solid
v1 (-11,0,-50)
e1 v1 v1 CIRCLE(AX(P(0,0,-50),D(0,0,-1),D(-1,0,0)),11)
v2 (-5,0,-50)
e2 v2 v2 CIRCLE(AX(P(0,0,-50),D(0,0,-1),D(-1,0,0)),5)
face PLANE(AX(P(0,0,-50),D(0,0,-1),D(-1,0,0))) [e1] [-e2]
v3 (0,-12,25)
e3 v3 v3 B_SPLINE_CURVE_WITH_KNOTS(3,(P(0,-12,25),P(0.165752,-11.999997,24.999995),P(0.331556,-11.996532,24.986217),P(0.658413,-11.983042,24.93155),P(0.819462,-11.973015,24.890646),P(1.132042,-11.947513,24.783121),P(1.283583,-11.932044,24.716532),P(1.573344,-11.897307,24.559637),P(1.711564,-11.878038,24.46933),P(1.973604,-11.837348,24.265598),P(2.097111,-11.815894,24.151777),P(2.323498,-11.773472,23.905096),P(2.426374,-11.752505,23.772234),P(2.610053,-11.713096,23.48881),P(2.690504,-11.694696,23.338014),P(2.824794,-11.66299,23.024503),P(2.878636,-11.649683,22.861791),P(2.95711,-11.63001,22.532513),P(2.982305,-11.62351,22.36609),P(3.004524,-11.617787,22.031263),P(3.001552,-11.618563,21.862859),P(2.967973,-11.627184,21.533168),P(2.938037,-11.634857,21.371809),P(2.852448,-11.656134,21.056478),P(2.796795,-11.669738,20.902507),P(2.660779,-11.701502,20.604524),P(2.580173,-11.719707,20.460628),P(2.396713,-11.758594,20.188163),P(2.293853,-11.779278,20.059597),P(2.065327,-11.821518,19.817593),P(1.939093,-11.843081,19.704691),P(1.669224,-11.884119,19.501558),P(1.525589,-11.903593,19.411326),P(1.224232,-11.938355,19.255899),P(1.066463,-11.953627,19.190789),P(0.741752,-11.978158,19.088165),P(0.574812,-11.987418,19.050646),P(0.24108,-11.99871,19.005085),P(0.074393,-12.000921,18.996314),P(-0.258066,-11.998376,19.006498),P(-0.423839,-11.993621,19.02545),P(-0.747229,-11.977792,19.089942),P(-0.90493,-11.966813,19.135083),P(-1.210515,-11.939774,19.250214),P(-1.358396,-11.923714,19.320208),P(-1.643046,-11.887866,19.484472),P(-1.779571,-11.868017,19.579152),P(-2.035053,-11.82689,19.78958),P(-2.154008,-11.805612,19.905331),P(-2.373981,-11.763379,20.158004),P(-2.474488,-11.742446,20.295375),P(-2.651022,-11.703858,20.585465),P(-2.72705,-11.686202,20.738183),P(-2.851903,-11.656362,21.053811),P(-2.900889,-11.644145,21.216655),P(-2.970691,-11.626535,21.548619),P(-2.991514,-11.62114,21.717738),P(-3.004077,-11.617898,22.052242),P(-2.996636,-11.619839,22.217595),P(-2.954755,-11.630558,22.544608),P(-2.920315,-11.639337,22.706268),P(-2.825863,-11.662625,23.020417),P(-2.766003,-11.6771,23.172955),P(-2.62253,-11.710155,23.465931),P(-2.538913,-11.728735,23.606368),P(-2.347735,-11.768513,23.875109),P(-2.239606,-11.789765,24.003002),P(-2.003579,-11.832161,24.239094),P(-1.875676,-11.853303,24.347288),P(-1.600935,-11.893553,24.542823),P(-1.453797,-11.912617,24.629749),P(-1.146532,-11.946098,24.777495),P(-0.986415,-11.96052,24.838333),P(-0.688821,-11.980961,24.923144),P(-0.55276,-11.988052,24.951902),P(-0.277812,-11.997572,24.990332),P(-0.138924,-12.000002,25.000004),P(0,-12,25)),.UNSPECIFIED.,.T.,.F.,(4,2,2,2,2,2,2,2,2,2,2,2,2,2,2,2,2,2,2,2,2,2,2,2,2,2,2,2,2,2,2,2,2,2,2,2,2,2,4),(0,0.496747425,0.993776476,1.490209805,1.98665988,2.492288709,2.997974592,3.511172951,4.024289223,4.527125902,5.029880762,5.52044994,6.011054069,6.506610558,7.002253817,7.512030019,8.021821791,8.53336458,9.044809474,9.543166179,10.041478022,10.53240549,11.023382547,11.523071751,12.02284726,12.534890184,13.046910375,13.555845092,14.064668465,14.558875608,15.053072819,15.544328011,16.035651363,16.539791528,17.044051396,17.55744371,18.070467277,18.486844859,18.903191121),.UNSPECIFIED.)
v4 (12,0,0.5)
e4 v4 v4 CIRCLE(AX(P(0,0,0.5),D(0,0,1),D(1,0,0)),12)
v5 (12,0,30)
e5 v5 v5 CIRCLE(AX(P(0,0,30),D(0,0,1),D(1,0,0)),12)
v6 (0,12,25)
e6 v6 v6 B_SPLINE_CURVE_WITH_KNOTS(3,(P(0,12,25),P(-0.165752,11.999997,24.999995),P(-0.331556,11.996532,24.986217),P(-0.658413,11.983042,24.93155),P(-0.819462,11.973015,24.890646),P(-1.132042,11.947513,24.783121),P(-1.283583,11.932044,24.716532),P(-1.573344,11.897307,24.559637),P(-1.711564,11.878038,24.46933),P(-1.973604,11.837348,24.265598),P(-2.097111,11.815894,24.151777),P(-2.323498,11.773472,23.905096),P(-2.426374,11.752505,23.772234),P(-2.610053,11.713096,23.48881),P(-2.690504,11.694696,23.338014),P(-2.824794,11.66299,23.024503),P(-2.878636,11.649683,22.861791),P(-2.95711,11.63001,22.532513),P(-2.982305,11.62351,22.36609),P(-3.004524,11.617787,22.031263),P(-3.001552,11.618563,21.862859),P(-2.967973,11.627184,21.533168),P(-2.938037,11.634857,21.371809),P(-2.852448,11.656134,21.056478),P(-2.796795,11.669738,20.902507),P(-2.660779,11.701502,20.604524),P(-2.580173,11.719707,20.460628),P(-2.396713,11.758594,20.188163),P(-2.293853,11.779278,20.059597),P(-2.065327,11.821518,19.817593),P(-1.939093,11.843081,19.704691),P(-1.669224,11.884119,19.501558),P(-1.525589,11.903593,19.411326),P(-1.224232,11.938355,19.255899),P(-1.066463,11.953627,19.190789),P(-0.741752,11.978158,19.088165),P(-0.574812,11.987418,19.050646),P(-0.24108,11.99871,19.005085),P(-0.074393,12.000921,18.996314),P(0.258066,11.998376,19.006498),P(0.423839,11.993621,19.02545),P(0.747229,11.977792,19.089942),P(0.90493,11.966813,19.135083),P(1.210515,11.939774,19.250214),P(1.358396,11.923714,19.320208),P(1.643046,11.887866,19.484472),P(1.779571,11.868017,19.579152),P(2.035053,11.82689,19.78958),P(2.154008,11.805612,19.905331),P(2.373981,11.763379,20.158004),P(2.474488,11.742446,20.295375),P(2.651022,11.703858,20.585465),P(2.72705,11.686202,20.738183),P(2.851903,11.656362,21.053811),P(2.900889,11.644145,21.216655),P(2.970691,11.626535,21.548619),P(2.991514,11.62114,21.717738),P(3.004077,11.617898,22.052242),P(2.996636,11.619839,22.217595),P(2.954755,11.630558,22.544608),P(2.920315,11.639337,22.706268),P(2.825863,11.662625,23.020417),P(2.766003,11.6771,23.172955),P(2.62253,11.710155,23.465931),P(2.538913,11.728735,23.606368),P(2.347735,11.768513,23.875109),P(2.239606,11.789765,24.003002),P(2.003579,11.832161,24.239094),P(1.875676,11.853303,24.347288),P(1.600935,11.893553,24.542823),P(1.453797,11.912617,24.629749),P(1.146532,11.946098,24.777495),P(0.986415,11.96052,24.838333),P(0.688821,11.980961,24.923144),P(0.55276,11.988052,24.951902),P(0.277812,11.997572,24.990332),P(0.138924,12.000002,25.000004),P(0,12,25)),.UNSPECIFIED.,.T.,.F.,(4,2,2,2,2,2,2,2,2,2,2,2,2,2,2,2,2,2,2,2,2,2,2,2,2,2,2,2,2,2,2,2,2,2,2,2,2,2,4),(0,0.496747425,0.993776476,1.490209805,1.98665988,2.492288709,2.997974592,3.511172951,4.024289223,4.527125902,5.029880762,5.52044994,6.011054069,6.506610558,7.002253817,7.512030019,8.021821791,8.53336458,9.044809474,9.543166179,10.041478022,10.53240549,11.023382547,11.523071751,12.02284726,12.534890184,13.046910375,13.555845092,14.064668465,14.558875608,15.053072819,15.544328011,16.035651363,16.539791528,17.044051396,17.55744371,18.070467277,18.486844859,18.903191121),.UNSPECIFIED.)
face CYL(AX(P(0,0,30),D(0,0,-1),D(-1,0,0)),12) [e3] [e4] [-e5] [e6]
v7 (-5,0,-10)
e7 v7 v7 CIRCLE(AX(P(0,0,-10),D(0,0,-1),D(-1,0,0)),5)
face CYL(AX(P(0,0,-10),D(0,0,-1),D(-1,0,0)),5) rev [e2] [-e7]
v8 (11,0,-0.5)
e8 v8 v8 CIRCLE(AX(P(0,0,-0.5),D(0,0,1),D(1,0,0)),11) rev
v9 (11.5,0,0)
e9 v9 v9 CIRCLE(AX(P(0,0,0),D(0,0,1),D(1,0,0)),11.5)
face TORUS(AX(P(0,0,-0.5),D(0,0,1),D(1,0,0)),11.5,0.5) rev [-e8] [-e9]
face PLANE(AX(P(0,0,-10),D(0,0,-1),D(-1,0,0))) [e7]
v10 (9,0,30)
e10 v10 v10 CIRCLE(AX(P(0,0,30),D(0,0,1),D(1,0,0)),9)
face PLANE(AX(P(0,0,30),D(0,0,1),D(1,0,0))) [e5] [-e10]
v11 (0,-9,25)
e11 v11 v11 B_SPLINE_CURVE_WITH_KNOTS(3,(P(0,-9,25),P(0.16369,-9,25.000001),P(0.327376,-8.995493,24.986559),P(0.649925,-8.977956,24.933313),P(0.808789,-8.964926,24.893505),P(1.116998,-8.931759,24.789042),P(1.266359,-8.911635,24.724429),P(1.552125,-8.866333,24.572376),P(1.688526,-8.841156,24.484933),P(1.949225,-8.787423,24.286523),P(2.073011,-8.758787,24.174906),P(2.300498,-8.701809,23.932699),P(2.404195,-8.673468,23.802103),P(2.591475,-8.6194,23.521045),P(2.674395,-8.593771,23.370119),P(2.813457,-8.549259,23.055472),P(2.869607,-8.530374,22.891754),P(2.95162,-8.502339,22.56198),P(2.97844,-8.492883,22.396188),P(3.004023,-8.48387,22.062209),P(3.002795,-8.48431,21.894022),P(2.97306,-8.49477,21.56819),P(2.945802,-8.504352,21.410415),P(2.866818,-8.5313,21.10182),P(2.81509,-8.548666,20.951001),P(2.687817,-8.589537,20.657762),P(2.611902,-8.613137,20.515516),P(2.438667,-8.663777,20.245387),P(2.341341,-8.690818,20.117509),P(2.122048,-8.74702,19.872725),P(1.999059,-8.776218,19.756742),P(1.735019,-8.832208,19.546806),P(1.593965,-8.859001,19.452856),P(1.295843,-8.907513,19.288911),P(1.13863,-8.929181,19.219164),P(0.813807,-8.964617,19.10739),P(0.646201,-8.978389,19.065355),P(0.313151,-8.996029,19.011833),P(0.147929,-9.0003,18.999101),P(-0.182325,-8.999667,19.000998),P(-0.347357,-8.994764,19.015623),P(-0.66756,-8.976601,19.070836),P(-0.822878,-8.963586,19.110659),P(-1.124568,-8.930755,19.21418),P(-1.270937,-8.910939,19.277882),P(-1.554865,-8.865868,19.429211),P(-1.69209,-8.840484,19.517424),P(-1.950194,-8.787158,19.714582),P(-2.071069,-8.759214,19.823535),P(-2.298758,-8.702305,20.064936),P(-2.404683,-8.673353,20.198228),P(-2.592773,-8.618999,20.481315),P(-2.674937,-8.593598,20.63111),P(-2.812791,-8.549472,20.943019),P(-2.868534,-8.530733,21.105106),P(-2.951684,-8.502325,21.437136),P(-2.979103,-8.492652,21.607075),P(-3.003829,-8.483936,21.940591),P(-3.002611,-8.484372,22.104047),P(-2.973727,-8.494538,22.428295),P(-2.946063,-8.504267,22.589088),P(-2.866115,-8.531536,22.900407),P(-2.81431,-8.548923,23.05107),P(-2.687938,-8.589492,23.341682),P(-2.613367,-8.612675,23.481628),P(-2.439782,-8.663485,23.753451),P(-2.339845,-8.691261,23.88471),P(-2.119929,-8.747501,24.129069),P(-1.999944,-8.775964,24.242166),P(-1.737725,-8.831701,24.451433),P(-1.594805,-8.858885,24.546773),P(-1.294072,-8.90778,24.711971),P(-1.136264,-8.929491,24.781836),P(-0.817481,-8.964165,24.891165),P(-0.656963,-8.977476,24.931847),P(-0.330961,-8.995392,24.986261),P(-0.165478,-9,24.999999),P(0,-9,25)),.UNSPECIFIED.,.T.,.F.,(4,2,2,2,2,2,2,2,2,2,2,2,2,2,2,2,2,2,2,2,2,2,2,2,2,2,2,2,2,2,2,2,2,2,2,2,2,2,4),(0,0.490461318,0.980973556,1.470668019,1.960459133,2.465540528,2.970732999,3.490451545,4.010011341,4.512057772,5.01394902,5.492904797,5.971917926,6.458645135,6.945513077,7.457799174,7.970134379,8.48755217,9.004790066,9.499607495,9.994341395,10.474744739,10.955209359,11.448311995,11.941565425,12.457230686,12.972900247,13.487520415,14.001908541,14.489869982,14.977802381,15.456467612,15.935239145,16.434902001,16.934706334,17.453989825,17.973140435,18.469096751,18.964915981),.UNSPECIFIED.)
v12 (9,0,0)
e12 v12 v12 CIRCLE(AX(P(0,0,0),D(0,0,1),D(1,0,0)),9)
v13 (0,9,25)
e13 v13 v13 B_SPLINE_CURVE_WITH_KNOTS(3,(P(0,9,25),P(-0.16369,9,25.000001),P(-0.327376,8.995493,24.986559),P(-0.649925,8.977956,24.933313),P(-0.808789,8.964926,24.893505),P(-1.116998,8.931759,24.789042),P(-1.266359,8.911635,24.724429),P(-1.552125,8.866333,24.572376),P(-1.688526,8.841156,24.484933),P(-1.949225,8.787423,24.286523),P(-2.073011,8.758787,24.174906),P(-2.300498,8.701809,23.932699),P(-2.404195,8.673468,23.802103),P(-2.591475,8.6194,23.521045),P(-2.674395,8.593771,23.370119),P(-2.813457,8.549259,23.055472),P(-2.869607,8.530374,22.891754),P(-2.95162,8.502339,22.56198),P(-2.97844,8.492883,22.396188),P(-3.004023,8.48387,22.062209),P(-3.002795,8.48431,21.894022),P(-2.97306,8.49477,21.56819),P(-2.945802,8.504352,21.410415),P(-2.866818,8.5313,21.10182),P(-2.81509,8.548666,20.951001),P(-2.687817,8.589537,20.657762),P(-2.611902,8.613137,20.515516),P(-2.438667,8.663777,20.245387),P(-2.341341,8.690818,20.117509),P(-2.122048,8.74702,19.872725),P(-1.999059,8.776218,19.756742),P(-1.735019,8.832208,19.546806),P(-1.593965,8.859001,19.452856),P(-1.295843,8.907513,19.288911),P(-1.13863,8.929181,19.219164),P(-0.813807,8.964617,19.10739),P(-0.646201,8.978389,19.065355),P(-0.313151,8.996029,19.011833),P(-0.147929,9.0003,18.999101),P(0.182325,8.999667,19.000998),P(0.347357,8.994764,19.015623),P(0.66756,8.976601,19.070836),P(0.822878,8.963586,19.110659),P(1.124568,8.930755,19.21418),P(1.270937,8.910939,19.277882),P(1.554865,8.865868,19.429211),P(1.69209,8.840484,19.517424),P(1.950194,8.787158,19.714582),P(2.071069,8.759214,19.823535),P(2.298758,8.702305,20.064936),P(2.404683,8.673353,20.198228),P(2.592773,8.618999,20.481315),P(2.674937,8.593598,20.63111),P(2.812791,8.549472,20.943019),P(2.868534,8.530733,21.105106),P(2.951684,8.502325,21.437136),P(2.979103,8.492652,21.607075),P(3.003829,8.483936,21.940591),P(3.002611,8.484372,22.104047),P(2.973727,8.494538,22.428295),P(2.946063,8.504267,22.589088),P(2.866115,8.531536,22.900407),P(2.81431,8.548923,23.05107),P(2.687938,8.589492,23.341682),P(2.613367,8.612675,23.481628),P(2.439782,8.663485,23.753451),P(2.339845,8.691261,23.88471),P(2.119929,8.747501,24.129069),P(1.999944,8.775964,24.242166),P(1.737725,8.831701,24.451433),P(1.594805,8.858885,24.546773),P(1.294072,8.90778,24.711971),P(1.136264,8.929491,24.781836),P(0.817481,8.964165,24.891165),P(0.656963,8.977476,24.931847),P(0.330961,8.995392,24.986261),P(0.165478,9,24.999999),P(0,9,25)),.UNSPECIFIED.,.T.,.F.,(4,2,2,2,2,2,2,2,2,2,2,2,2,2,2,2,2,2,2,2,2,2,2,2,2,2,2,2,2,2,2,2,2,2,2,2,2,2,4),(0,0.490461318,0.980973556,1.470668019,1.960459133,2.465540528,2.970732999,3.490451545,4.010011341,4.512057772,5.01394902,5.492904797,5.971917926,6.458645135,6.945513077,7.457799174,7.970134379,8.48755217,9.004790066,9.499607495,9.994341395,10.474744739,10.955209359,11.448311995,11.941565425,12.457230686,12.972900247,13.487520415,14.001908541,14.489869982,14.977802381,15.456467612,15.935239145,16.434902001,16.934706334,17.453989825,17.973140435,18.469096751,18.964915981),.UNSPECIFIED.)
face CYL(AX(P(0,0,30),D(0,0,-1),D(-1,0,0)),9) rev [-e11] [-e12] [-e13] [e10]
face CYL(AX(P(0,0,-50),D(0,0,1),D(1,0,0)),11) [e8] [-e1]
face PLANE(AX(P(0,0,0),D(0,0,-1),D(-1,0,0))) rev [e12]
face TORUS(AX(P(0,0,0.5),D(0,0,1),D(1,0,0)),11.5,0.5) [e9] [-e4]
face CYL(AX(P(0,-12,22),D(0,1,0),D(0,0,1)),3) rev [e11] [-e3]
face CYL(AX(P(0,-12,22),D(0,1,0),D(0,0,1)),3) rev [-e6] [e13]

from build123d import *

# Parameters (mm, degrees)
SKETCH1_R               = 12
SKETCH1_R_2             = 9
BOSS_EXTRUDE1_DEPTH     = 30
SKETCH2_R               = 11
BOSS_EXTRUDE2_DEPTH     = 50
SKETCH3_R               = 5
CUT_EXTRUDE1_DEPTH      = 40
CUT_EXTRUDE2_DEPTH      = 53.80151513
CUT_EXTRUDE2_DEPTH_BACK = 53.80151513
SKETCH4_R               = 3
FILLET1_R               = 0.5


with BuildPart() as part:
    # Sketch1 → Boss-Extrude1 (new body)
    with BuildSketch(Plane.XY):
        Circle(SKETCH1_R)
        Circle(SKETCH1_R_2, mode=Mode.SUBTRACT)
    extrude(amount=BOSS_EXTRUDE1_DEPTH)

    # Sketch2 → Boss-Extrude2 (add)
    with BuildSketch(Plane(origin=(0, 0, 0), x_dir=(-1, 0, 0), z_dir=(0, 0, -1))):
        Circle(SKETCH2_R)
    extrude(amount=BOSS_EXTRUDE2_DEPTH)

    # Sketch3 → Cut-Extrude1 (cut)
    with BuildSketch(Plane(origin=(0, 0, -50), x_dir=(-1, 0, 0), z_dir=(0, 0, -1))):
        Circle(SKETCH3_R)
    extrude(amount=-CUT_EXTRUDE1_DEPTH, mode=Mode.SUBTRACT)

    # Sketch4 → Cut-Extrude2 (cut, two sides: drawn at the far end of the back side and taken through both)
    with BuildSketch(Plane(origin=(0, 0, 0), x_dir=(1, 0, 0), z_dir=(0, 1, 0)).offset(-CUT_EXTRUDE2_DEPTH_BACK)):
        with Locations(Location((0, -22, 0), (0, 0, 270))):
            Circle(SKETCH4_R)
    extrude(amount=CUT_EXTRUDE2_DEPTH + CUT_EXTRUDE2_DEPTH_BACK, mode=Mode.SUBTRACT)

    # Fillet1
    fillet1_edges = [part.edges().sort_by_distance(p)[0] for p in [
        (-12, 0, 0),
        (11, 0, 0),
    ]]
    fillet(fillet1_edges, radius=FILLET1_R - 0.0001)  # a hair under: the kernel refuses the full size


solid = part.part
